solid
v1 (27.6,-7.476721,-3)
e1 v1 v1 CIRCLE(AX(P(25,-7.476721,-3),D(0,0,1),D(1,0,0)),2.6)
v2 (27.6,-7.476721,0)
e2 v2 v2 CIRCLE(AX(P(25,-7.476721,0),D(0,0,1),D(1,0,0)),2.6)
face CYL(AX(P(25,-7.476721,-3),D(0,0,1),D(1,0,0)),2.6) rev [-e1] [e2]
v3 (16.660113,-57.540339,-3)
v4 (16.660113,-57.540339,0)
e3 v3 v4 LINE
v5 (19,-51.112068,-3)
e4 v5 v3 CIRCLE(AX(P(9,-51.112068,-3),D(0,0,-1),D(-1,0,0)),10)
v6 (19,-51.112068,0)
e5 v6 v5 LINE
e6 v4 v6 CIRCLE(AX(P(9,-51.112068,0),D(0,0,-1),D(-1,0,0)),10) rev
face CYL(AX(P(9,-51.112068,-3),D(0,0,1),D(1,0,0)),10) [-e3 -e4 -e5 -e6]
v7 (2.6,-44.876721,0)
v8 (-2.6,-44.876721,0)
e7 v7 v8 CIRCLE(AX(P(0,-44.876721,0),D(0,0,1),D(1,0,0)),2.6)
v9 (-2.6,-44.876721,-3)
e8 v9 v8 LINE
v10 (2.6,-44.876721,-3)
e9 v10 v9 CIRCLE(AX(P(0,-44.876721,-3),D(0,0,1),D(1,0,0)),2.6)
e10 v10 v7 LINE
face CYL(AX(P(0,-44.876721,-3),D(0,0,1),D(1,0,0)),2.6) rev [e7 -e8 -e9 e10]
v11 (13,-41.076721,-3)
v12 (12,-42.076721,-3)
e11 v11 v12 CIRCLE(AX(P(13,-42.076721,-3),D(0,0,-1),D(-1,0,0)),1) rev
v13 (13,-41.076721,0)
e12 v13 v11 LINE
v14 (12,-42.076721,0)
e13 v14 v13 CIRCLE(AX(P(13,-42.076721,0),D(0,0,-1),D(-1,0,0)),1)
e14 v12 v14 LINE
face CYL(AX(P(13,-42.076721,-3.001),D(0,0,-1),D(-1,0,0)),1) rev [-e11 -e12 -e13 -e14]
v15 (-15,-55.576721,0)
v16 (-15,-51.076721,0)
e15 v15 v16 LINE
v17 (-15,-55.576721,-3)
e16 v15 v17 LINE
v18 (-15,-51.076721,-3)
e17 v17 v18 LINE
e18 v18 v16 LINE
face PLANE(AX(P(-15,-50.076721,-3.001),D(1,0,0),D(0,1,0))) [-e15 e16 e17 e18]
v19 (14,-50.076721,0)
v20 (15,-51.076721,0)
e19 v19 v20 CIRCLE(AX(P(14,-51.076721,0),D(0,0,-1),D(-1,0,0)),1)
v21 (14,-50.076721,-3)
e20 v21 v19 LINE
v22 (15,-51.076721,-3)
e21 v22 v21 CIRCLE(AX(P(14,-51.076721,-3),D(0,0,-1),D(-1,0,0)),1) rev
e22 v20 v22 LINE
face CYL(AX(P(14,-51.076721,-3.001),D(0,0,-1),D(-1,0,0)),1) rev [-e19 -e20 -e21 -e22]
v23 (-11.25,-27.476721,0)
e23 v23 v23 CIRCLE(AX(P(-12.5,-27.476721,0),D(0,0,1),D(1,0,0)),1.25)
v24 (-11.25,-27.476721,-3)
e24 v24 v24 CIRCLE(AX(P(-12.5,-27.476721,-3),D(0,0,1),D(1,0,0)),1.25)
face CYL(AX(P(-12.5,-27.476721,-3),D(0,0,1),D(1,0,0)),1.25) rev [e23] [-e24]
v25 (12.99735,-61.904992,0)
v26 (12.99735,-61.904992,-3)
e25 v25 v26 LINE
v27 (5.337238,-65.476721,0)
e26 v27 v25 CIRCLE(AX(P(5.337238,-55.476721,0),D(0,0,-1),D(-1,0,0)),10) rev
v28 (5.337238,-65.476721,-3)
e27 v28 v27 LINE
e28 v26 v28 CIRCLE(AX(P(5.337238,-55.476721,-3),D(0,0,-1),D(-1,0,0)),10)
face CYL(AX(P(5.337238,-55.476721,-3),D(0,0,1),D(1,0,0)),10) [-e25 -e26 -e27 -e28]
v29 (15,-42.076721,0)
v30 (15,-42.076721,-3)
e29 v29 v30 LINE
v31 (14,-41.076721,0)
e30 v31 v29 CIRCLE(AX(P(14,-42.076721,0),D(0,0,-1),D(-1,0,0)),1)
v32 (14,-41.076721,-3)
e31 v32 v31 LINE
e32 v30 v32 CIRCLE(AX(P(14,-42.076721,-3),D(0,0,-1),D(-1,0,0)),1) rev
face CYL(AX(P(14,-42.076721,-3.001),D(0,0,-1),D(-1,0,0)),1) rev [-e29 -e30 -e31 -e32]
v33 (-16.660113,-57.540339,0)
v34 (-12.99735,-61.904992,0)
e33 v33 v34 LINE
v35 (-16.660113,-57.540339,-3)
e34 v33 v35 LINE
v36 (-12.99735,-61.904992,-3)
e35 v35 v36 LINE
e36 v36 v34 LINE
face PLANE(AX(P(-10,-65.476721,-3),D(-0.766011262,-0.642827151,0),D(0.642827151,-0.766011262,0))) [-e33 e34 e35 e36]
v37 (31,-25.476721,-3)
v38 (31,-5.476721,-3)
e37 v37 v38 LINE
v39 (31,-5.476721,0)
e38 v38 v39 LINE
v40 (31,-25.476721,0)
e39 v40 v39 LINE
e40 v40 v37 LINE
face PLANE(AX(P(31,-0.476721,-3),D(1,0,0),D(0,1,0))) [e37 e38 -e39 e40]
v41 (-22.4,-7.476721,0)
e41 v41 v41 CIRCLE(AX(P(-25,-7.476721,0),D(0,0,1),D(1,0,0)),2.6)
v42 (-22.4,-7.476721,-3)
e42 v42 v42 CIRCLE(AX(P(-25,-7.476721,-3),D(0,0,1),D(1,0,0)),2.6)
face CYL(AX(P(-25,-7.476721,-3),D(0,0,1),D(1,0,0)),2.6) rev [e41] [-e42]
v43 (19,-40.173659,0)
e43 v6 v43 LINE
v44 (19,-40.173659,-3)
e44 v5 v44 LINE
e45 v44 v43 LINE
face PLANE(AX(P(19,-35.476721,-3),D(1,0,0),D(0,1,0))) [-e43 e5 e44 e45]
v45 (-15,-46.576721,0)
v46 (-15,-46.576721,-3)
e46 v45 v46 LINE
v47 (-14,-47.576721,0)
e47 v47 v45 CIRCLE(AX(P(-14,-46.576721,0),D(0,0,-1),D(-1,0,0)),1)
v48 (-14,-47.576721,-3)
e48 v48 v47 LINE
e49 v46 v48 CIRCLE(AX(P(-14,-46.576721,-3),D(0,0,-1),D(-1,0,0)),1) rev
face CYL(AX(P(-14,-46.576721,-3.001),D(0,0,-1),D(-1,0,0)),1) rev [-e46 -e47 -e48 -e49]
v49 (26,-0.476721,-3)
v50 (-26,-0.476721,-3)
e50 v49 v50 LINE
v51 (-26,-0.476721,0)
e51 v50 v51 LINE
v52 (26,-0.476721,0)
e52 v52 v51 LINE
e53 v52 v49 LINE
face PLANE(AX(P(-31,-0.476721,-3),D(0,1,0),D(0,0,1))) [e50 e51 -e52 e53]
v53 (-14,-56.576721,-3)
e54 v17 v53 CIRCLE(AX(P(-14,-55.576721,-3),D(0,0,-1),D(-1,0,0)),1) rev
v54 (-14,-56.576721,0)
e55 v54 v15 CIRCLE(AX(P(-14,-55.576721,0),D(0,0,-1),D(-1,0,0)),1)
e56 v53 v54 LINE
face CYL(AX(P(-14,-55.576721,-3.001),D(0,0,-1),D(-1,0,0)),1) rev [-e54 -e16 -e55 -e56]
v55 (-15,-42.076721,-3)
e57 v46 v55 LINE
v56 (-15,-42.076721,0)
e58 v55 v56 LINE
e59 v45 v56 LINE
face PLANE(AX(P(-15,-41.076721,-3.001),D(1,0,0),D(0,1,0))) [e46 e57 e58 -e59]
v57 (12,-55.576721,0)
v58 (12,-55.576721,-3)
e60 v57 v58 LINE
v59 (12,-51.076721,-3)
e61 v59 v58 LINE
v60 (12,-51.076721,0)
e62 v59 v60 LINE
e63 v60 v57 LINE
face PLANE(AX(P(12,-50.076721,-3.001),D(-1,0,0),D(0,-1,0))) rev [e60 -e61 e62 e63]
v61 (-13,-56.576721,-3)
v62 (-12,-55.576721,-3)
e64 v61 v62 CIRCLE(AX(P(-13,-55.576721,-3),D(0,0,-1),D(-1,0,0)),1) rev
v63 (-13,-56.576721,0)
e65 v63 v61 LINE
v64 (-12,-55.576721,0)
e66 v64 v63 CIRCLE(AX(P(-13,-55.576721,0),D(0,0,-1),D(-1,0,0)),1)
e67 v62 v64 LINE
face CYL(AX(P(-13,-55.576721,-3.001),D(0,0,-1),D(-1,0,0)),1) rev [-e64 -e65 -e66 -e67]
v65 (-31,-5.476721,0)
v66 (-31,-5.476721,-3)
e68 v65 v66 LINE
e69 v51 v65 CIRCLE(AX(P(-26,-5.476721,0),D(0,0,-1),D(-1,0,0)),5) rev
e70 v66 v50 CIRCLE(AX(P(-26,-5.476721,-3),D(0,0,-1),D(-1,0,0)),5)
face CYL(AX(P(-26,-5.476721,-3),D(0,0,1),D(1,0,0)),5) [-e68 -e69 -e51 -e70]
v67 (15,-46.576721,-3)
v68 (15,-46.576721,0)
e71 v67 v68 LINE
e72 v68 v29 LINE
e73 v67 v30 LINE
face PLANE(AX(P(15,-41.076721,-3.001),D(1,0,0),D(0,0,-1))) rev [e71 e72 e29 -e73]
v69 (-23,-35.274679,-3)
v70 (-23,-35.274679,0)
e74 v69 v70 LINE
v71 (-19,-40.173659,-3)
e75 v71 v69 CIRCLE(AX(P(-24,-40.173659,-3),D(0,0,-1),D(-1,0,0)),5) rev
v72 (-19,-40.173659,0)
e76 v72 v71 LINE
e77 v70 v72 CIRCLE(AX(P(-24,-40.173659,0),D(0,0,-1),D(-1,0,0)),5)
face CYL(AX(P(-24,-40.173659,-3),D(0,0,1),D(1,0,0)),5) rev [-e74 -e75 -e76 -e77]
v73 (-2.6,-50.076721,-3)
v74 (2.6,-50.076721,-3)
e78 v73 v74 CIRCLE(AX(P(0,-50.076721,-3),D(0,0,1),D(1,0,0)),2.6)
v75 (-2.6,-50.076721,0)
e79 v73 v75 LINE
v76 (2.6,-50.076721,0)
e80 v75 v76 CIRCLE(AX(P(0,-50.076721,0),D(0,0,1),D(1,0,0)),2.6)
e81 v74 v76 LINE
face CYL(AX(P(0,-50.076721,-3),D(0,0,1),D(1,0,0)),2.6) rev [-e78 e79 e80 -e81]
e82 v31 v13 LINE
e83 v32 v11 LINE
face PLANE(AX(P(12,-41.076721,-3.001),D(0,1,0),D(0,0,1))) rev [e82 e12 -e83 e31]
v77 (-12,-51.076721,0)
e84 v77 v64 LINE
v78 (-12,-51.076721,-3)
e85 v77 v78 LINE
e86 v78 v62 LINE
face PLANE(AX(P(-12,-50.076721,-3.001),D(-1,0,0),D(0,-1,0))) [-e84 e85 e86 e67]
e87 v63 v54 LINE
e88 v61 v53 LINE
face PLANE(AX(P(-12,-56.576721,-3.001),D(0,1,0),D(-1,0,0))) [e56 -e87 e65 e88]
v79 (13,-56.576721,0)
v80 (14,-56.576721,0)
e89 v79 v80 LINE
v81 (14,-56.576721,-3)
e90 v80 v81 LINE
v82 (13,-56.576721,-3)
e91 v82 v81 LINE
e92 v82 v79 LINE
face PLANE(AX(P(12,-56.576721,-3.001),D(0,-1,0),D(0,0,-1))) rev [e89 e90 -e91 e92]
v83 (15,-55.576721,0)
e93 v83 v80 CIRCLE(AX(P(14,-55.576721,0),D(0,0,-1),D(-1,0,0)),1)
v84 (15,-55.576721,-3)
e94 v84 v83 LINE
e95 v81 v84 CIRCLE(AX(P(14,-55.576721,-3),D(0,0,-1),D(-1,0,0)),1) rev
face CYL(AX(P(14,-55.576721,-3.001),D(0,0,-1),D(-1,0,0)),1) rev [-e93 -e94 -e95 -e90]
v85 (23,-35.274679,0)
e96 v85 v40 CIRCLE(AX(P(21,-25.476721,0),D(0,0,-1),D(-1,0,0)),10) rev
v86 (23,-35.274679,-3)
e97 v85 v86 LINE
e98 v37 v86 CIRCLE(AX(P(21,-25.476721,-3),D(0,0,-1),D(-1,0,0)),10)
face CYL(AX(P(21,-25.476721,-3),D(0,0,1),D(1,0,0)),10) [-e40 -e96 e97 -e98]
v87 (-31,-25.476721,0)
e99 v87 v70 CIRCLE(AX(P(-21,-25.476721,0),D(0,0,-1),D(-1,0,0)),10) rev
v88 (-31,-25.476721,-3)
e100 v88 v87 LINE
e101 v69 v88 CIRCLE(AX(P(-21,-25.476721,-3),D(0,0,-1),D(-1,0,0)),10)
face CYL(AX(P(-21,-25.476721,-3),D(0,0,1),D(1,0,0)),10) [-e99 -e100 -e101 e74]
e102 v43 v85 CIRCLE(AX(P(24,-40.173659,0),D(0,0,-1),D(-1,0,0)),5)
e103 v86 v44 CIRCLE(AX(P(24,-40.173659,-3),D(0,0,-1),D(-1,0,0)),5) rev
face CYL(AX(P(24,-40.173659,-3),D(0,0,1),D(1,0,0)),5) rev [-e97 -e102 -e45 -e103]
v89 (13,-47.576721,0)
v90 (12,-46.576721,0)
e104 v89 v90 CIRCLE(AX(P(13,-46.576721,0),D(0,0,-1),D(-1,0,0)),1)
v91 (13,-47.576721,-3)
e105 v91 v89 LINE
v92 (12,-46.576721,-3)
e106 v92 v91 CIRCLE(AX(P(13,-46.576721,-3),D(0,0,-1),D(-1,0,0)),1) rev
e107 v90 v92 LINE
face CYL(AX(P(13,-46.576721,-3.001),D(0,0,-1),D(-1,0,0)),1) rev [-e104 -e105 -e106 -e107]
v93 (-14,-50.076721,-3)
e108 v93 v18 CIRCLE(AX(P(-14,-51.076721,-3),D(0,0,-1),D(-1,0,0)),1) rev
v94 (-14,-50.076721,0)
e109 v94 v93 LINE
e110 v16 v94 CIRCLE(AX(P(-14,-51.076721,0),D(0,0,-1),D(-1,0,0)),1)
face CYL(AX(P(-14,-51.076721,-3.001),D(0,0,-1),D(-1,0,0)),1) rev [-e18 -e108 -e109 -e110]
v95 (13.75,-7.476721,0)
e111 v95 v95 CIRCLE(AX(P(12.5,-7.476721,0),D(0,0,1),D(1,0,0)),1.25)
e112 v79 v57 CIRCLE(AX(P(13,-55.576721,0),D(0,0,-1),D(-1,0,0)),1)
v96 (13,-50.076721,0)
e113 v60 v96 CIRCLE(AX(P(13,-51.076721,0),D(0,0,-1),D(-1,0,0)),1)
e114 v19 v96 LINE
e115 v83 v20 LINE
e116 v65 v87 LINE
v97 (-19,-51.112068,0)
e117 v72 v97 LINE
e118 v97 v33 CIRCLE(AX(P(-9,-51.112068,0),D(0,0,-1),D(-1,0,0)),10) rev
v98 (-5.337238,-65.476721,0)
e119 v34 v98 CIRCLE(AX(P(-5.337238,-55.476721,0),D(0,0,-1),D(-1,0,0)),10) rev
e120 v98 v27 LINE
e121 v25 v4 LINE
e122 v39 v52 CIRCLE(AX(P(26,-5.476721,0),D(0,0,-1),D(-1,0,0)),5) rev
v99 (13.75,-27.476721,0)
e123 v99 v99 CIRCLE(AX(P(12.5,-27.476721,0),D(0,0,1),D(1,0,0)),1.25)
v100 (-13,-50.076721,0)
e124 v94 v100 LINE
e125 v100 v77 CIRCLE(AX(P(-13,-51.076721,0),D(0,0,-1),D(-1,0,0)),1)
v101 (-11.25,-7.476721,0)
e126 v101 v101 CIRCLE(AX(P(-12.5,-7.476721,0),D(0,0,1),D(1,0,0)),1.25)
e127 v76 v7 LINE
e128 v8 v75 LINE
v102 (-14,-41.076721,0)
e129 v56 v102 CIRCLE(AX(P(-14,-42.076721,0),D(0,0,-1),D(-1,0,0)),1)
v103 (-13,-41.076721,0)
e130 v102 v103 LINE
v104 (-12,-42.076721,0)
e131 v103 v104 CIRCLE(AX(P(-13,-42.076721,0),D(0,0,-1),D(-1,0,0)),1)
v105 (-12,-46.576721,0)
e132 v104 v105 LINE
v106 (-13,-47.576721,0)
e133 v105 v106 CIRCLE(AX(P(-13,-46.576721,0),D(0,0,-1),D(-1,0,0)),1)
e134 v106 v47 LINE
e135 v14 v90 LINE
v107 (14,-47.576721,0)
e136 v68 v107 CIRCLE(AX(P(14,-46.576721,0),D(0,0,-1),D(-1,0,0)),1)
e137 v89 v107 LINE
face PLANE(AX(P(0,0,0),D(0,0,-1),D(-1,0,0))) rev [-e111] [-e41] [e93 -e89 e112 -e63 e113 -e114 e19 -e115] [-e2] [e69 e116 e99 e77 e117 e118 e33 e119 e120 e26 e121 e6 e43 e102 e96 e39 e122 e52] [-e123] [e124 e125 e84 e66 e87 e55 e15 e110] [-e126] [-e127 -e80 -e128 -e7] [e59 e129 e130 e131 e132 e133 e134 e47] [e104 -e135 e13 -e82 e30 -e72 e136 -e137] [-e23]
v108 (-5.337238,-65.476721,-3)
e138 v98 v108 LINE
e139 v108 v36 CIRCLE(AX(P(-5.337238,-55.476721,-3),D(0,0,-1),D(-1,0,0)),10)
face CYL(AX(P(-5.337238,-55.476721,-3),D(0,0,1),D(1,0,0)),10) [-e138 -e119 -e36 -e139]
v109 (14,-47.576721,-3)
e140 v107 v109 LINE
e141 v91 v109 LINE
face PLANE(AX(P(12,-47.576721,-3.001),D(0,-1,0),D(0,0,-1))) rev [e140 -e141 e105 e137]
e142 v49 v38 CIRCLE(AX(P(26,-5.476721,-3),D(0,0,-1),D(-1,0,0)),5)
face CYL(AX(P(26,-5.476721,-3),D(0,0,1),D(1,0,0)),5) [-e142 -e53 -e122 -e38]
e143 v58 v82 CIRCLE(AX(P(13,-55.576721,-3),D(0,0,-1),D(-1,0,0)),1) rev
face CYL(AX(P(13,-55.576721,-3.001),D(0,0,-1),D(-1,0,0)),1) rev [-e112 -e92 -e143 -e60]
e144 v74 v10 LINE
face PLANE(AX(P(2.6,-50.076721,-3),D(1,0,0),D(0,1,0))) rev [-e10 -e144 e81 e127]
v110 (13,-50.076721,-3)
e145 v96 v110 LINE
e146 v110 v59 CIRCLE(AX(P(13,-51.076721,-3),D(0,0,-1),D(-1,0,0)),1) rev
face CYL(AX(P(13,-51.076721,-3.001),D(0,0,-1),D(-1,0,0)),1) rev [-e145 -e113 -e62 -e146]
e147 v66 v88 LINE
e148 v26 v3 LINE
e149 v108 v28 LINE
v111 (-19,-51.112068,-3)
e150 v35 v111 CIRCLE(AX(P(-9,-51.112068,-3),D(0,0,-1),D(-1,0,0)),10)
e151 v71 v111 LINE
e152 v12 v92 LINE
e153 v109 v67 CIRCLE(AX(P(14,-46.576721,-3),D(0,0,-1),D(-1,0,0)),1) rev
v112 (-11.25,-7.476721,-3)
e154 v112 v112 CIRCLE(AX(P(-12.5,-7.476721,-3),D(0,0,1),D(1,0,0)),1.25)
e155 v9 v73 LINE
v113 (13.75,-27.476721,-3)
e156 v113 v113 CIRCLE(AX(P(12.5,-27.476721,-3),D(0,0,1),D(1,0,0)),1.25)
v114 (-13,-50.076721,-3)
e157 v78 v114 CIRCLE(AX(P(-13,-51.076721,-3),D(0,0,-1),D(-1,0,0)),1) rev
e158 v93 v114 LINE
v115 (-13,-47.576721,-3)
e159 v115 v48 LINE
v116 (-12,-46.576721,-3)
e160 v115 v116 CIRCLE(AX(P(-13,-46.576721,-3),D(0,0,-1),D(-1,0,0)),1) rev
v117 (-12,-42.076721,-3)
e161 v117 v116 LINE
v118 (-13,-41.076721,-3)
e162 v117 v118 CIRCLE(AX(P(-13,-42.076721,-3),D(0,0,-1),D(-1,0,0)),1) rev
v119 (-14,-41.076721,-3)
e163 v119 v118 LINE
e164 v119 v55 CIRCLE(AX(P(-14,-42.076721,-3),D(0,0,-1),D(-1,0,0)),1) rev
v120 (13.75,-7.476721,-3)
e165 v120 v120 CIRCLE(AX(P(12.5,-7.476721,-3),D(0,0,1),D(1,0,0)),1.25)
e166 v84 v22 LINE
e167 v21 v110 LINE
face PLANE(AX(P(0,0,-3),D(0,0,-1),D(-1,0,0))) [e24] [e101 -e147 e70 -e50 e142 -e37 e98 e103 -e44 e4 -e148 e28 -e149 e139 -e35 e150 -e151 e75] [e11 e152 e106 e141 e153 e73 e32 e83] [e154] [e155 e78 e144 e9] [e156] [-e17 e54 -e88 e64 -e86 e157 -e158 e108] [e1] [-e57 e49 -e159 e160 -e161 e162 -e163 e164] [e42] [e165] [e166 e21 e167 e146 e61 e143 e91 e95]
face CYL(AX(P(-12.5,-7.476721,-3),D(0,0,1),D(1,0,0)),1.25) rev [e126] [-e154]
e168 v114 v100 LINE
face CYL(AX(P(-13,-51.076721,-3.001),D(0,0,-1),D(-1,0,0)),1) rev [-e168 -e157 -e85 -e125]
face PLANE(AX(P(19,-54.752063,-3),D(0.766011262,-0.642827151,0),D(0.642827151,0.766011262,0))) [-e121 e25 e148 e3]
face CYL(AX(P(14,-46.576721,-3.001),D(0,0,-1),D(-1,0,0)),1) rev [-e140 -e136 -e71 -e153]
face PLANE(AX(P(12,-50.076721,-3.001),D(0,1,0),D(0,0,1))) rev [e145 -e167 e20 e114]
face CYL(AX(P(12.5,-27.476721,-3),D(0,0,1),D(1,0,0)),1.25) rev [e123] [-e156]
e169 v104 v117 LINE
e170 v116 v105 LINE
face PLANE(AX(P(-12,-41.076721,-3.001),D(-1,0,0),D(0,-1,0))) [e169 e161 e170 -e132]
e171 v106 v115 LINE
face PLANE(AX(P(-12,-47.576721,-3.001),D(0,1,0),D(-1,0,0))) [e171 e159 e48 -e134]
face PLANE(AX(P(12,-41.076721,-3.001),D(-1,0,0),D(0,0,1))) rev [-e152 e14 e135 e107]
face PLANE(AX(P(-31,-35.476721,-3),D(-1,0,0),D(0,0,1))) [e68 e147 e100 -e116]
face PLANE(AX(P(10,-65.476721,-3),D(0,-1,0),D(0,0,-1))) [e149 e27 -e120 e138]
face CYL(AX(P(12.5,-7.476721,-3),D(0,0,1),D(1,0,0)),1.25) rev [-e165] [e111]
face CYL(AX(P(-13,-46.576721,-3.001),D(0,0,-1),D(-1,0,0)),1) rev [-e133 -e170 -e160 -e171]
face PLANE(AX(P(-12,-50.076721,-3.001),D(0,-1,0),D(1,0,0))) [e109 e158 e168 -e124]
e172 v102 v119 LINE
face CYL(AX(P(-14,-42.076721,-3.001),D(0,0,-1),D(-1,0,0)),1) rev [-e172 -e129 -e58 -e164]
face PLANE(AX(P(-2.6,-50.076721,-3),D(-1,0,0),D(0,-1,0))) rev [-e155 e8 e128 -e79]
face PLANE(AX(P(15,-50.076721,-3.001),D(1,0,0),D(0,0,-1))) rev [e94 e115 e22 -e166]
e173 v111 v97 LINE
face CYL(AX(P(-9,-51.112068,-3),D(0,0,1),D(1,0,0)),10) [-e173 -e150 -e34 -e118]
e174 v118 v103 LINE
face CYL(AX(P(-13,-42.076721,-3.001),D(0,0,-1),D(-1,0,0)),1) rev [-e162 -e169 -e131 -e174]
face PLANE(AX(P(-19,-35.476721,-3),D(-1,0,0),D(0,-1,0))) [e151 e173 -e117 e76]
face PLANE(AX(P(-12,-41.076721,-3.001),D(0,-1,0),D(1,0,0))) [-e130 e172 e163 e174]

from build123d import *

# Parameters (mm, degrees)
SKETCH1_R            = 2.6
SKETCH1_R_2          = 1.25
BASE_FLANGE1_DEPTH   = 3
FILLET1_R            = 5
FILLET2_R            = 10
CUT_EXTRUDE1_REACH   = 74.507
SKETCH3_W            = 3
SKETCH3_H            = 6.5
FILLET3_R            = 1
FILLET3_OF_MIRROR1_R = 1
FILLET4_R            = 5


# Sheet-metal steps are written as plain solids
with BuildPart() as part:
    # Sketch1 → Base-Flange1 (new body)
    with BuildSketch(Plane.XY):
        Polygon((-31, -0.476720525), (31, -0.476720525), (31, -35.476720525), (19, -35.476720525), (19, -54.752062511), (10, -65.476720525), (-10, -65.476720525), (-19, -54.752062511), (-19, -35.476720525), (-31, -35.476720525), align=None)
        with Locations((25, -7.476720525)):
            Circle(SKETCH1_R, mode=Mode.SUBTRACT)
        with Locations((-25, -7.476720525)):
            Circle(SKETCH1_R, mode=Mode.SUBTRACT)
        with Locations((-12.5, -27.476720525)):
            Circle(SKETCH1_R_2, mode=Mode.SUBTRACT)
        with Locations((12.5, -27.476720525)):
            Circle(SKETCH1_R_2, mode=Mode.SUBTRACT)
        with Locations((12.5, -7.476720525)):
            Circle(SKETCH1_R_2, mode=Mode.SUBTRACT)
        with Locations((-12.5, -7.476720525)):
            Circle(SKETCH1_R_2, mode=Mode.SUBTRACT)
        with BuildLine():
            Line((-2.6, -50.076720525), (-2.6, -44.876720525))
            ThreePointArc((-2.6, -44.876720525), (0, -42.276720525), (2.6, -44.876720525))
            Line((2.6, -44.876720525), (2.6, -50.076720525))
            ThreePointArc((2.6, -50.076720525), (0, -52.676720525), (-2.6, -50.076720525))
        make_face(mode=Mode.SUBTRACT)
    extrude(amount=-BASE_FLANGE1_DEPTH)

    # Fillet1
    fillet1_edges = [part.edges().sort_by_distance(p)[0] for p in [
        (-31, -0.476720525, -1.5),
        (31, -0.476720525, -1.5),
    ]]
    fillet(fillet1_edges, radius=FILLET1_R)

    # Fillet2
    fillet2_edges = [part.edges().sort_by_distance(p)[0] for p in [
        (31, -35.476720525, -1.5),
        (19, -54.752062511, -1.5),
        (10, -65.476720525, -1.5),
        (-10, -65.476720525, -1.5),
        (-19, -54.752062511, -1.5),
        (-31, -35.476720525, -1.5),
    ]]
    fillet(fillet2_edges, radius=FILLET2_R)

    # Sketch3 → Cut-Extrude1 (cut, up to next)
    with BuildSketch(Plane.XY, mode=Mode.PRIVATE) as cut_extrude1_sk1:
        with Locations((13.5, -44.326720525)):
            Rectangle(SKETCH3_W, SKETCH3_H)
    cut_extrude1_tool1 = extrude(cut_extrude1_sk1.sketch, amount=-CUT_EXTRUDE1_REACH, mode=Mode.PRIVATE) & part.part
    # Sketch3 → Cut-Extrude1 (cut, up to next)
    with BuildSketch(Plane.XY, mode=Mode.PRIVATE) as cut_extrude1_sk2:
        with Locations((13.5, -53.326720525)):
            Rectangle(SKETCH3_W, SKETCH3_H)
    cut_extrude1_tool2 = extrude(cut_extrude1_sk2.sketch, amount=-CUT_EXTRUDE1_REACH, mode=Mode.PRIVATE) & part.part
    cut_extrude1_1 = cut_extrude1_tool1.solids().sort_by_distance((13.5, -44.326721, 0))[0]
    add(cut_extrude1_1, mode=Mode.SUBTRACT)
    cut_extrude1_2 = cut_extrude1_tool2.solids().sort_by_distance((13.5, -53.326721, 0))[0]
    add(cut_extrude1_2, mode=Mode.SUBTRACT)
    cut_extrude1 = cut_extrude1_1 + cut_extrude1_2  # Cut-Extrude1 as one shape, for the pattern or mirror that repeats it

    # Fillet3
    fillet3_edges = [part.edges().sort_by_distance(p)[0] for p in [
        (12, -47.576720525, -1.5),
        (12, -41.076720525, -1.5),
        (15, -41.076720525, -1.5),
        (15, -47.576720525, -1.5),
        (12, -56.576720525, -1.5),
        (12, -50.076720525, -1.5),
        (15, -50.076720525, -1.5),
        (15, -56.576720525, -1.5),
    ]]
    fillet(fillet3_edges, radius=FILLET3_R)

    # Mirror1: Cut-Extrude1 across plane
    add(cut_extrude1.mirror(Plane(origin=(0, 0, 0), x_dir=(0, 0, 1), z_dir=(1, 0, 0))), mode=Mode.SUBTRACT)

    # Fillet3 of Mirror1
    fillet3_of_mirror1_edges = [part.edges().sort_by_distance(p)[0] for p in [
        (-12, -47.576720525, -1.5),
        (-12, -41.076720525, -1.5),
        (-15, -41.076720525, -1.5),
        (-15, -47.576720525, -1.5),
        (-12, -56.576720525, -1.5),
        (-12, -50.076720525, -1.5),
        (-15, -50.076720525, -1.5),
        (-15, -56.576720525, -1.5),
    ]]
    fillet(fillet3_of_mirror1_edges, radius=FILLET3_OF_MIRROR1_R)

    # Fillet4
    fillet4_edges = [part.edges().sort_by_distance(p)[0] for p in [
        (19, -35.476720525, -1.5),
        (-19, -35.476720525, -1.5),
    ]]
    fillet(fillet4_edges, radius=FILLET4_R)


solid = part.part
